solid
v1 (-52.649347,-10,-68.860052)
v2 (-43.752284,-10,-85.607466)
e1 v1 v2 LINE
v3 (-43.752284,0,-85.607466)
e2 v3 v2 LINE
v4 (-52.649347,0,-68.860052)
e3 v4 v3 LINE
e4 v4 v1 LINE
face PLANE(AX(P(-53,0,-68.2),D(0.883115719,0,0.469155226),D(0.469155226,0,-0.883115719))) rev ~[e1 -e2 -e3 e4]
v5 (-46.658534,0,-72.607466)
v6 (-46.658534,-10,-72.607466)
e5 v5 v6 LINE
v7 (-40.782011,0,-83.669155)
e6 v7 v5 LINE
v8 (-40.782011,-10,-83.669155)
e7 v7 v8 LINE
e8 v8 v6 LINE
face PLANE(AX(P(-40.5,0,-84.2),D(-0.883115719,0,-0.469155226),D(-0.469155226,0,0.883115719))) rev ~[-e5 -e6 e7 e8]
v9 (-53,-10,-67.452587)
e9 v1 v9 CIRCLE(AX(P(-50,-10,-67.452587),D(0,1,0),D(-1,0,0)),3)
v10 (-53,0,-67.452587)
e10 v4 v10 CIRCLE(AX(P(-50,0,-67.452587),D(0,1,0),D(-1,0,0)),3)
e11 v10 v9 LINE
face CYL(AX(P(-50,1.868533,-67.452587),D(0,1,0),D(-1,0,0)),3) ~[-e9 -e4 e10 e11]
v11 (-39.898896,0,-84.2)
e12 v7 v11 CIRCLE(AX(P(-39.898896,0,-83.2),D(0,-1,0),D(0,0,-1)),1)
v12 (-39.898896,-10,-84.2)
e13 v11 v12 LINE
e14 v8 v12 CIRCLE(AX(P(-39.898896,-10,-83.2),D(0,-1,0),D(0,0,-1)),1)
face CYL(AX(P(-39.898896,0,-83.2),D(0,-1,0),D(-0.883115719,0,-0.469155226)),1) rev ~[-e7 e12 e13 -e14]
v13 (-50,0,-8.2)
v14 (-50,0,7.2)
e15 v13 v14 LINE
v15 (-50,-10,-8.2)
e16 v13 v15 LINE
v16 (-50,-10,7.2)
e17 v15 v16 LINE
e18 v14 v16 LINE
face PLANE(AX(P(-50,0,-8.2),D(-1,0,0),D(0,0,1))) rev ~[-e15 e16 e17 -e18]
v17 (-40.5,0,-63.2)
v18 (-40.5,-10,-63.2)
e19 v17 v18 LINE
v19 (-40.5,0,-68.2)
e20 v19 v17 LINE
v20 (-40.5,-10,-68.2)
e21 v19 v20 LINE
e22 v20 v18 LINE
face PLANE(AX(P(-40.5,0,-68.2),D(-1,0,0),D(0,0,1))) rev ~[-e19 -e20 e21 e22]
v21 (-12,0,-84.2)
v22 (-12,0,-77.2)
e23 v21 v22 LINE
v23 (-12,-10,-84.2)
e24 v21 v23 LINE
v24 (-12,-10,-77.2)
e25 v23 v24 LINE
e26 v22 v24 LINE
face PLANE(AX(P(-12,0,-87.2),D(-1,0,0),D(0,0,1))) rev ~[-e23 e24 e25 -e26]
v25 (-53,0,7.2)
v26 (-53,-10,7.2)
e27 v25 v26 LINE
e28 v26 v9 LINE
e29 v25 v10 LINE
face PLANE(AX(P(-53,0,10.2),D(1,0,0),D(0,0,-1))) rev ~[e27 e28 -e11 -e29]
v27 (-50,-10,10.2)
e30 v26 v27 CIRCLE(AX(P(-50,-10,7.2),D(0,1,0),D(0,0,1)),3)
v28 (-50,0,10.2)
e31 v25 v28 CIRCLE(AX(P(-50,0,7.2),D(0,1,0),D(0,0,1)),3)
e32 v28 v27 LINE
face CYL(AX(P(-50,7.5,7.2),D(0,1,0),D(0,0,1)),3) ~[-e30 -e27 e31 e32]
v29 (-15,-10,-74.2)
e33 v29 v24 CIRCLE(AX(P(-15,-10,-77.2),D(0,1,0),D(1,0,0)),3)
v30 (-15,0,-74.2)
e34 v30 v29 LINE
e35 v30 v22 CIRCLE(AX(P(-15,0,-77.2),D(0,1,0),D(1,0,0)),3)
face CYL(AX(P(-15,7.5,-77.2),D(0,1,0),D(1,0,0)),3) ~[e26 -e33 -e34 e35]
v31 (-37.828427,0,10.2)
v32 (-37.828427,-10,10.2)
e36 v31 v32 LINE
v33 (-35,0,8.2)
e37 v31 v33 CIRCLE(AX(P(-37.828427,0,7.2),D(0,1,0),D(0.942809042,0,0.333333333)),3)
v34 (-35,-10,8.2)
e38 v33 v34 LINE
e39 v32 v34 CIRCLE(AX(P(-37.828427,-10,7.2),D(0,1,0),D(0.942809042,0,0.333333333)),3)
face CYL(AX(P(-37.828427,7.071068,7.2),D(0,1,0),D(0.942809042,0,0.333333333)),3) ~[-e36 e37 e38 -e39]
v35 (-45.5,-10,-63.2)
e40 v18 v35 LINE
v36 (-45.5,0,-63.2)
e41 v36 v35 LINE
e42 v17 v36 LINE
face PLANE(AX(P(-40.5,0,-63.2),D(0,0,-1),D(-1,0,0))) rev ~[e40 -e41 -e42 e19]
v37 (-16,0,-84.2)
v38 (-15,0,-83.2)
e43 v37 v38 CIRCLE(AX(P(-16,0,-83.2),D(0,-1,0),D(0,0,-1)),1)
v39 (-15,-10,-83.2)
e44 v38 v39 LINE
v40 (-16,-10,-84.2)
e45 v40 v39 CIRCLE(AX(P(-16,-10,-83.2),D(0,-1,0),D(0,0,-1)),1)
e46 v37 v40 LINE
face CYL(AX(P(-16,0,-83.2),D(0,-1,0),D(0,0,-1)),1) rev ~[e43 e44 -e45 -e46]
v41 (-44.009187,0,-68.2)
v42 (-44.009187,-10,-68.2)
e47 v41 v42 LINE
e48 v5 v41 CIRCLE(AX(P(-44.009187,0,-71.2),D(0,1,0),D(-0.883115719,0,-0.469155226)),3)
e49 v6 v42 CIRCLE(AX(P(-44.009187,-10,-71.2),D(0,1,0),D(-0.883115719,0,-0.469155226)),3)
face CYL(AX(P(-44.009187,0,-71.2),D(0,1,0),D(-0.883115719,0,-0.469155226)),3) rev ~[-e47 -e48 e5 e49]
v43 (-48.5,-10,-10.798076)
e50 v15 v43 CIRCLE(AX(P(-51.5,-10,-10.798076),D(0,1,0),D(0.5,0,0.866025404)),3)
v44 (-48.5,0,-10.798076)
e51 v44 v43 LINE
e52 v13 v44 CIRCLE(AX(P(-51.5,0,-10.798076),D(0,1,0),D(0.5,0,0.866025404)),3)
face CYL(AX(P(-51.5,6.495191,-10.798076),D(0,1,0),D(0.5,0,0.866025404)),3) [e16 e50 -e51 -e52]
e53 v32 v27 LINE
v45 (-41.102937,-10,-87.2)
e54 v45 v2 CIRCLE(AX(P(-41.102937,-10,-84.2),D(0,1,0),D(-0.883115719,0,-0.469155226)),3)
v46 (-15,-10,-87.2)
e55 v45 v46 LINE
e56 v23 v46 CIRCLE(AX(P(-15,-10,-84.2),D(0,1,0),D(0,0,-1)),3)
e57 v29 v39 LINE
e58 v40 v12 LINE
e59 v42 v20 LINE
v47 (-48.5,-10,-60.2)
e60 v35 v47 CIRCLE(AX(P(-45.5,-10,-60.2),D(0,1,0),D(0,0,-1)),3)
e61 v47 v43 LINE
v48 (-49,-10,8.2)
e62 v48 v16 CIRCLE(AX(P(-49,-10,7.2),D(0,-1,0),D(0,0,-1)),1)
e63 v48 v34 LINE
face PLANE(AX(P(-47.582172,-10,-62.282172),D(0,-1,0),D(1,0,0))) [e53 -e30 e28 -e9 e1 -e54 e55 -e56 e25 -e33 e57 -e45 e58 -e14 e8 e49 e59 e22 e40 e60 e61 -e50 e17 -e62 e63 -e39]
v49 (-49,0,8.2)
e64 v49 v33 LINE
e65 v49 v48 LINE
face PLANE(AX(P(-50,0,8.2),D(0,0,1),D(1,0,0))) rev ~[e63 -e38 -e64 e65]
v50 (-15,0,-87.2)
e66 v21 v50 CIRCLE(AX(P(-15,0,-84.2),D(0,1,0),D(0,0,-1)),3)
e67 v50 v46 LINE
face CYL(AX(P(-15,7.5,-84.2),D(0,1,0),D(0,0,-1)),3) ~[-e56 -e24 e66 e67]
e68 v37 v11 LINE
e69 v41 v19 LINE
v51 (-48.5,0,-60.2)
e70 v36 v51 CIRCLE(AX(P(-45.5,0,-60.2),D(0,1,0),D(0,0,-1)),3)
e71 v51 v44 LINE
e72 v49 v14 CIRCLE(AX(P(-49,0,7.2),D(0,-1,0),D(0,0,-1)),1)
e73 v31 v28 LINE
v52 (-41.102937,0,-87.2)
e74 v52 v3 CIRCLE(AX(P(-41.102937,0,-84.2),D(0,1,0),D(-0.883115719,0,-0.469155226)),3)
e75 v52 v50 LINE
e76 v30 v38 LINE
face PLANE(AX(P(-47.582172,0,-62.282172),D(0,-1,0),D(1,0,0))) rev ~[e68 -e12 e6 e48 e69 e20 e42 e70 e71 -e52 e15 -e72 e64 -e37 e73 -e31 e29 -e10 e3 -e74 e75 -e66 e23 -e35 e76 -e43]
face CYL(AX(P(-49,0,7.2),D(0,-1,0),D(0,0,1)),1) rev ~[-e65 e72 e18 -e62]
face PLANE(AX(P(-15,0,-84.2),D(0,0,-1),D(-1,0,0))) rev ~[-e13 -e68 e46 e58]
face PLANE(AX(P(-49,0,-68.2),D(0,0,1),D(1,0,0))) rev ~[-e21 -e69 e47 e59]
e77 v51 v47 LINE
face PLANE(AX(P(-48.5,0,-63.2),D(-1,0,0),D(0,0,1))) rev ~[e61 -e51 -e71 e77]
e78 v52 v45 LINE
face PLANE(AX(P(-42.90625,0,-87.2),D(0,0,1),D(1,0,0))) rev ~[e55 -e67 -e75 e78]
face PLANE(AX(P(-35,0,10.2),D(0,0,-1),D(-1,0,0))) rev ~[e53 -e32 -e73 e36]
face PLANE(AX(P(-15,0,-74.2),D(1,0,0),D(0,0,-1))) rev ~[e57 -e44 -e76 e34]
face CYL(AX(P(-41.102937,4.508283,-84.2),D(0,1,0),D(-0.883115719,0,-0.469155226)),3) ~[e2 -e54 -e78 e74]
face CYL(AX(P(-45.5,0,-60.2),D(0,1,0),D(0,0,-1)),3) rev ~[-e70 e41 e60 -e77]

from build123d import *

# Parameters (mm, degrees)
F1_DEPTH    = 10
F2_T1_DEPTH = 25
F2_T3_DEPTH = 24.1421356237
F2_T5_DEPTH = 19.0165664987
F2_T7_DEPTH = 13.7370663506
F3_R        = 1
F4_T1_DEPTH = 10
F4_T3_DEPTH = 10
F4_T5_DEPTH = 22.9903810568


# Not quite as in the source:
# - a fillet or chamfer that OpenCascade refuses, or shapes differently, is made with other operations: its cross-section is extruded or revolved along the edge and cut away or added
# - a feature names something its author has since deleted; it is built from what else it names


with BuildPart() as f1:
    # F0 (on Front) → F1 (new body)
    with BuildSketch(Plane.XZ):
        Polygon((-50, 8.2), (-35, 8.2), (-35, 10.2), (-53, 10.2), (-53, -68.2), (-49, -68.2), (-49, -63.2), (-48.5, -63.2), (-48.5, -8.2), (-50, -8.2), align=None)
        Polygon((-49, -68.2), (-53, -68.2), (-44.5, -84.2), (-40.5, -84.2), align=None)
        Polygon((-12, -74.2), (-15, -74.2), (-15, -84.2), (-40.5, -84.2), (-44.5, -84.2), (-42.90625, -87.2), (-12, -87.2), align=None)
        Polygon((-40.5, -68.2), (-40.5, -63.2), (-48.5, -63.2), (-49, -63.2), (-49, -68.2), align=None)
    extrude(amount=F1_DEPTH)

    # F2: fillet of radius 3 on 6 edges, made by hand

    # F2_s2 → F2_t1 (cut)
    with BuildSketch(Plane.XZ.offset(-7.5)):
        with BuildLine():
            ThreePointArc((-50, 10.2), (-52.1213203436, 9.3213203436), (-53, 7.2))
            Line((-53, 7.2), (-53, 10.2))
            Line((-53, 10.2), (-50, 10.2))
        make_face()
        with BuildLine():
            ThreePointArc((-12, -77.2), (-12.8786796564, -75.0786796564), (-15, -74.2))
            Line((-15, -74.2), (-12, -74.2))
            Line((-12, -74.2), (-12, -77.2))
        make_face()
        with BuildLine():
            ThreePointArc((-15, -87.2), (-12.8786796564, -86.3213203436), (-12, -84.2))
            Line((-12, -84.2), (-12, -87.2))
            Line((-12, -87.2), (-15, -87.2))
        make_face()
    extrude(amount=F2_T1_DEPTH, mode=Mode.SUBTRACT)

    # F2_s4 → F2_t3 (cut)
    with BuildSketch(Plane.XZ.offset(-7.0710678119)):
        with BuildLine():
            ThreePointArc((-35, 8.2), (-36.0963763172, 9.6494897428), (-37.8284271247, 10.2))
            Line((-37.8284271247, 10.2), (-35, 10.2))
            Line((-35, 10.2), (-35, 8.2))
        make_face()
    extrude(amount=F2_T3_DEPTH, mode=Mode.SUBTRACT)

    # F2_s6 → F2_t5 (cut)
    with BuildSketch(Plane.XZ.offset(-4.5082832494)):
        with BuildLine():
            ThreePointArc((-43.7522838586, -85.6074656779), (-42.648511507, -86.7712251004), (-41.1029367003, -87.2))
            Line((-41.1029367003, -87.2), (-42.90625, -87.2))
            Line((-42.90625, -87.2), (-43.7522838586, -85.6074656779))
        make_face()
    extrude(amount=F2_T5_DEPTH, mode=Mode.SUBTRACT)

    # F2_s8 → F2_t7 (cut)
    with BuildSketch(Plane.XZ.offset(-1.8685331753)):
        with BuildLine():
            ThreePointArc((-53, -67.4525867299), (-52.9110171311, -68.1778310077), (-52.6493471584, -68.8600524078))
            Line((-52.6493471584, -68.8600524078), (-53, -68.2))
            Line((-53, -68.2), (-53, -67.4525867299))
        make_face()
    extrude(amount=F2_T7_DEPTH, mode=Mode.SUBTRACT)

    # F3
    f3_edges = [f1.edges().sort_by_distance(p)[0] for p in [
        (-40.5, -5, -84.2),
        (-15, -5, -84.2),
        (-50, -5, 8.2),
    ]]
    fillet(f3_edges, radius=F3_R)

    # F4: fillet of radius 3 on 3 edges, made by hand

    # F4_s2 → F4_t1 (join)
    with BuildSketch(Plane.XZ):
        with BuildLine():
            ThreePointArc((-46.6585338586, -72.6074656779), (-46.5804118006, -69.6544251933), (-44.0091867003, -68.2))
            Line((-44.0091867003, -68.2), (-49, -68.2))
            Line((-49, -68.2), (-46.6585338586, -72.6074656779))
        make_face()
    extrude(amount=F4_T1_DEPTH)

    # F4_s4 → F4_t3 (join)
    with BuildSketch(Plane.XZ):
        with BuildLine():
            ThreePointArc((-45.5, -63.2), (-47.6213203436, -62.3213203436), (-48.5, -60.2))
            Line((-48.5, -60.2), (-48.5, -63.2))
            Line((-48.5, -63.2), (-45.5, -63.2))
        make_face()
    extrude(amount=F4_T3_DEPTH)

    # F4_s6 → F4_t5 (cut)
    with BuildSketch(Plane.XZ.offset(-6.4951905284)):
        with BuildLine():
            ThreePointArc((-50, -8.2), (-48.9019237886, -9.2980762114), (-48.5, -10.7980762114))
            Line((-48.5, -10.7980762114), (-48.5, -8.2))
            Line((-48.5, -8.2), (-50, -8.2))
        make_face()
    extrude(amount=F4_T5_DEPTH, mode=Mode.SUBTRACT)


solid = f1.part
